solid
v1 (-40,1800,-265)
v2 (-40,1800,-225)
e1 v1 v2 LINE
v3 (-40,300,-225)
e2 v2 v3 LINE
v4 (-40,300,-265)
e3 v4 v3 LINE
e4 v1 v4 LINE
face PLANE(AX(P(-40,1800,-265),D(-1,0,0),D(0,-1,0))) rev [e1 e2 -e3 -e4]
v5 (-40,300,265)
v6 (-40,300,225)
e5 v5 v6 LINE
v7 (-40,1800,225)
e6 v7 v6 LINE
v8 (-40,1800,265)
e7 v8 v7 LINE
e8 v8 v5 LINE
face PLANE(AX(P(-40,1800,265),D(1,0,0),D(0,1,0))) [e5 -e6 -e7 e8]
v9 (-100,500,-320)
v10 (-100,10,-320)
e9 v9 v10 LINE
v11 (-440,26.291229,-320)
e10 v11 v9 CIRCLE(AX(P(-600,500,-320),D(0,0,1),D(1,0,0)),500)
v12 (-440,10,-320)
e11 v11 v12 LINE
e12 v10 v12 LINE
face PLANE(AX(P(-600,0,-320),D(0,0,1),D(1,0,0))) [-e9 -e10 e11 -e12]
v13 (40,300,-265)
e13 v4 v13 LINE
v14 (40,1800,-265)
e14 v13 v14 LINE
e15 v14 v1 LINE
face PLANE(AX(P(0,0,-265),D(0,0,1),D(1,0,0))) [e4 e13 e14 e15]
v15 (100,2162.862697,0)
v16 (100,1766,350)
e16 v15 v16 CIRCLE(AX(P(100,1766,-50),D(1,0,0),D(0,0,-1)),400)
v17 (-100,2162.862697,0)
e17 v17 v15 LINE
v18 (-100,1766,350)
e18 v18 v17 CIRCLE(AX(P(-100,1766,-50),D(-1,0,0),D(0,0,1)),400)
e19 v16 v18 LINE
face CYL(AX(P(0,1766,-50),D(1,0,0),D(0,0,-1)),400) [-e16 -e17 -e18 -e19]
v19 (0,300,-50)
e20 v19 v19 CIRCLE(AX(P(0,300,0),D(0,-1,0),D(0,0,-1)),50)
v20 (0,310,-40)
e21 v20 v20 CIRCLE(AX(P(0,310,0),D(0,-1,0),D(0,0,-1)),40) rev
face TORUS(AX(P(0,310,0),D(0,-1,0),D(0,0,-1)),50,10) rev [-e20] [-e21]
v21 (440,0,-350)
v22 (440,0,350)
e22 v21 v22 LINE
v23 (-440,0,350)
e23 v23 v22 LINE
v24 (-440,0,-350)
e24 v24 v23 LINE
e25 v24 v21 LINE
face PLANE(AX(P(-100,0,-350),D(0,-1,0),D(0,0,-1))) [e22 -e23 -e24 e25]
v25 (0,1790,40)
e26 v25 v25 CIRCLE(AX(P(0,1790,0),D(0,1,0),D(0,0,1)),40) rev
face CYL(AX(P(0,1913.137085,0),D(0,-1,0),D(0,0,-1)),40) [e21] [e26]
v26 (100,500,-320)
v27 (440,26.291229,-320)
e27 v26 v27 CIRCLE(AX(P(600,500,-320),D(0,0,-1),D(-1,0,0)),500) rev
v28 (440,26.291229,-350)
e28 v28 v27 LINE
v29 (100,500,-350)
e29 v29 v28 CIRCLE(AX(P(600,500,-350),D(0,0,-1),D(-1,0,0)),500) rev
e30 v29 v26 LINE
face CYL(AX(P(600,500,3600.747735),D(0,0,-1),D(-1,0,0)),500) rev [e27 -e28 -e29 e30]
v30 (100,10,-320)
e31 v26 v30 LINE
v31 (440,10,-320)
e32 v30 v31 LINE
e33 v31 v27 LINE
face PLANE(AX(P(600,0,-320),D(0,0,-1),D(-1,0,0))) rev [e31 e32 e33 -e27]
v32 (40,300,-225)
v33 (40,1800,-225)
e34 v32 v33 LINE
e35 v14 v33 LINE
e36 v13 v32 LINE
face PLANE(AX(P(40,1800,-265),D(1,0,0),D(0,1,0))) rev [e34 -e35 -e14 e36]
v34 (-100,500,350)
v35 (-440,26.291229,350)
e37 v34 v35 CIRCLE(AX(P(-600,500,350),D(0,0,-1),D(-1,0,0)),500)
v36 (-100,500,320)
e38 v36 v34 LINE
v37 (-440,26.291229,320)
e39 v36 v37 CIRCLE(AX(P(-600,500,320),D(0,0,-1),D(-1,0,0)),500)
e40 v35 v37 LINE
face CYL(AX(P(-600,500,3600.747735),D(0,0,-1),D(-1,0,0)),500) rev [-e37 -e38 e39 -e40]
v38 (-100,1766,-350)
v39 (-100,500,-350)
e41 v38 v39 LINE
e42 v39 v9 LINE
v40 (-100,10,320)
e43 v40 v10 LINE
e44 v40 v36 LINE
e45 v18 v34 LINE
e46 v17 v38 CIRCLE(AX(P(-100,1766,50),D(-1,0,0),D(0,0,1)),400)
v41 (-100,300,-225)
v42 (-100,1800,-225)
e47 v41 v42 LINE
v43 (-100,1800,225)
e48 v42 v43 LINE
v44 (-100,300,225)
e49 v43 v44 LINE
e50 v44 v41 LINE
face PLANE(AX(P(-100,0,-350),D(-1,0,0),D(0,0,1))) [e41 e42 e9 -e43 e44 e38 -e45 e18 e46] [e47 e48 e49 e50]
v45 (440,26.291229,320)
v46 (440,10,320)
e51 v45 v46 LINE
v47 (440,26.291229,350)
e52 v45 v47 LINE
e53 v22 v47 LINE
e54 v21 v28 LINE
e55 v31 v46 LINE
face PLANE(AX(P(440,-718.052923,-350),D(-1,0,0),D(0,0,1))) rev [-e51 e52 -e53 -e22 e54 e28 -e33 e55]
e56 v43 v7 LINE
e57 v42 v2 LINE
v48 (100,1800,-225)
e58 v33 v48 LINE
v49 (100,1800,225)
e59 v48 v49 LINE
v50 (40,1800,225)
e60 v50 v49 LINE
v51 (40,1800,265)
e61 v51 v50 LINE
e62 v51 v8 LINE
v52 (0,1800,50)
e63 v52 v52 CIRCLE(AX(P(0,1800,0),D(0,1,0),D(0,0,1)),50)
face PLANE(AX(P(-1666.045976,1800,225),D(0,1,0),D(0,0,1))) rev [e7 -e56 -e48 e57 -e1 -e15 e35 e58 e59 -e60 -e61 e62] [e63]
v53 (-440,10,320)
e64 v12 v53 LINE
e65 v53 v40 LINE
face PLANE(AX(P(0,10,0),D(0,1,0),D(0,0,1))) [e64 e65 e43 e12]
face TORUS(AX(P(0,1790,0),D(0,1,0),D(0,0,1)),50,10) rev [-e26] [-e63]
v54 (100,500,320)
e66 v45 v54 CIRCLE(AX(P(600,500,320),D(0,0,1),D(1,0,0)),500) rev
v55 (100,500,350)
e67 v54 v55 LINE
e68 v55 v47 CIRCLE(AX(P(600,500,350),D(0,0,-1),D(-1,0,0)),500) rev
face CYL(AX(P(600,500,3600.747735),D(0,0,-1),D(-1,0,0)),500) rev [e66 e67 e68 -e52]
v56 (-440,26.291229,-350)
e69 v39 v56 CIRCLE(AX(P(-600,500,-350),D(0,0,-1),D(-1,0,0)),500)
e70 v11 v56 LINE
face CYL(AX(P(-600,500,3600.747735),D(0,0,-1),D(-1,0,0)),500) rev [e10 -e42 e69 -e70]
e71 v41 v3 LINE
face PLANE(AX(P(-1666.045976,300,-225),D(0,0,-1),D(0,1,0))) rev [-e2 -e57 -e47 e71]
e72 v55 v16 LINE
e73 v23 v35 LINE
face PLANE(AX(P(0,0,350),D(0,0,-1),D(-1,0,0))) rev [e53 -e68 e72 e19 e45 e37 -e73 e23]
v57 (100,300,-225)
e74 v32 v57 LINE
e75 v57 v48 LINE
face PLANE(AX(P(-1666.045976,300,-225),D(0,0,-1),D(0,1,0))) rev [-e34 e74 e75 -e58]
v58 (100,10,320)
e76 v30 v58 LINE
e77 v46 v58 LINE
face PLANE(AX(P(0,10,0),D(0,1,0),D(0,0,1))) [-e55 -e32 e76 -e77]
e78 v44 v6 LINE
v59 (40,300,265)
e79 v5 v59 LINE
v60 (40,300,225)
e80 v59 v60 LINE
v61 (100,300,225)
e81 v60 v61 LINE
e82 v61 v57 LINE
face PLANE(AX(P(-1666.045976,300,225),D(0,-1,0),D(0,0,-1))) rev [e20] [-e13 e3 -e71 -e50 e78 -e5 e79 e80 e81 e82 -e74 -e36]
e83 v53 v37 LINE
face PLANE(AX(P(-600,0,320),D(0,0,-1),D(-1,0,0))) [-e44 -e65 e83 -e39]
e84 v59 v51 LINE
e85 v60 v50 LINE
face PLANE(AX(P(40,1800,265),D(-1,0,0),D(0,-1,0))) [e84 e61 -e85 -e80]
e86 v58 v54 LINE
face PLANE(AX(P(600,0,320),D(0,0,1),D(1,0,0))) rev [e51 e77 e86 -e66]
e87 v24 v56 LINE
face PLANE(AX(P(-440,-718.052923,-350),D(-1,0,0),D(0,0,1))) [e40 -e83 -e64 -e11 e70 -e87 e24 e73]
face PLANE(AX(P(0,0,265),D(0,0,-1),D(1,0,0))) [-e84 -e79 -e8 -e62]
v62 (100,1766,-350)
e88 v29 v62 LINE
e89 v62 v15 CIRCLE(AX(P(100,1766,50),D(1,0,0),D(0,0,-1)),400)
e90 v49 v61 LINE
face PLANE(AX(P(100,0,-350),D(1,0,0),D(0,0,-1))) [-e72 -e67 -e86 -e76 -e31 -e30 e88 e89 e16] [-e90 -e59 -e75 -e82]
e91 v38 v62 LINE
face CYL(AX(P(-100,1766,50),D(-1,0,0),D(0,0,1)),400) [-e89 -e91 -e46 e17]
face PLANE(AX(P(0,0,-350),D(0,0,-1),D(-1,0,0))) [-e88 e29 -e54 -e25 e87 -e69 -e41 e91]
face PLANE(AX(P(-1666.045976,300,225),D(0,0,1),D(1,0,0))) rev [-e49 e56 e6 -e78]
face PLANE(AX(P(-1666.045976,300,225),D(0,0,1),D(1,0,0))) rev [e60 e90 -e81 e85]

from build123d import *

# Parameters (mm, degrees)
AUFSATZ_LINEAR_AUSTRAGEN1_DEPTH             = 350
AUFSATZ_LINEAR_AUSTRAGEN1_DEPTH_BACK        = 350
SKIZZE1_W                                   = 200
SKIZZE1_H                                   = 2166
VERRUNDUNG1_R                               = 400
SKIZZE2_W                                   = 450
SKIZZE2_H                                   = 1500
SCHNITT_LINEAR_AUSTRAGEN1_DEPTH             = 200
SKIZZE4_W                                   = 80
SKIZZE4_H                                   = 1500
SCHNITT_LINEAR_AUSTRAGEN2_DEPTH             = 40
SKIZZE5_R                                   = 40
AUFSATZ_LINEAR_AUSTRAGEN2_DEPTH             = 1500
VERRUNDUNG2_R                               = 10
SKIZZE6_W                                   = 30
SKIZZE6_H                                   = 500
AUFSATZ_LINEAR_AUSTRAGEN3_DEPTH             = 500
SKIZZE7_W                                   = 1200
SKIZZE7_H                                   = 700
AUFSATZ_LINEAR_AUSTRAGEN4_DEPTH             = 10
SCHNITT_LINEAR_AUSTRAGEN3_DEPTH             = 2352.164614527
SCHNITT_LINEAR_AUSTRAGEN4_REACH             = 2264.149
SKIZZE10_W                                  = 160
SKIZZE10_H                                  = 700
SCHNITT_LINEAR_AUSTRAGEN4_DIRECTION_2_DEPTH = 2263.148932027


with BuildPart() as part:
    # Skizze1 → Aufsatz-Linear austragen1 (new, two sides: drawn at the far end of the back side and taken through both)
    with BuildSketch(Plane.XY.offset(-AUFSATZ_LINEAR_AUSTRAGEN1_DEPTH_BACK)):
        with Locations((0, 1083)):
            Rectangle(SKIZZE1_W, SKIZZE1_H)
    extrude(amount=AUFSATZ_LINEAR_AUSTRAGEN1_DEPTH + AUFSATZ_LINEAR_AUSTRAGEN1_DEPTH_BACK)

    # Verrundung1
    # the kernel refuses this fillet: 400 mm, written as the material it takes off along each edge
    with BuildSketch(Plane(origin=(1100, 2166, -350), x_dir=(0, -1, 0), z_dir=(-1, 0, 0)), Plane(origin=(1100, 2166, 350), x_dir=(0, 0, -1), z_dir=(-1, 0, 0))) as verrundung1_piece_1:
        with BuildLine():
            CenterArc((VERRUNDUNG1_R, VERRUNDUNG1_R), VERRUNDUNG1_R, 180, 90)
            Line((0, VERRUNDUNG1_R), (0, 0))
            Line((0, 0), (VERRUNDUNG1_R, 0))
        make_face()
    extrude(amount=2200, mode=Mode.SUBTRACT)

    # Skizze2 → Schnitt-Linear austragen1 (cut)
    with BuildSketch(Plane(origin=(100, 0, 0), x_dir=(0, 0, -1), z_dir=(1, 0, 0))):
        with Locations((0, 1050)):
            Rectangle(SKIZZE2_W, SKIZZE2_H)
    extrude(amount=-SCHNITT_LINEAR_AUSTRAGEN1_DEPTH, mode=Mode.SUBTRACT)

    # Skizze4 → Schnitt-Linear austragen2 (cut)
    with BuildSketch(Plane.XY.offset(-225)):
        with Locations((0, 1050)):
            Rectangle(SKIZZE4_W, SKIZZE4_H)
    schnitt_linear_austragen2 = extrude(amount=-SCHNITT_LINEAR_AUSTRAGEN2_DEPTH, mode=Mode.SUBTRACT)

    # Spiegeln1: Schnitt-Linear austragen2 across plane
    add(schnitt_linear_austragen2.mirror(Plane.XY), mode=Mode.SUBTRACT)

    # Skizze5 → Aufsatz-Linear austragen2 (add)
    with BuildSketch(Plane(origin=(0, 300, 0), x_dir=(1, 0, 0), z_dir=(0, 1, 0))):
        with Locations(Location((0, 0, 0), (0, 0, 90))):
            Circle(SKIZZE5_R)
    extrude(amount=AUFSATZ_LINEAR_AUSTRAGEN2_DEPTH)

    # Verrundung2
    verrundung2_edges = [part.edges().sort_by_distance(p)[0] for p in [
        (0, 300, 40),
        (0, 1800, 40),
    ]]
    fillet(verrundung2_edges, radius=VERRUNDUNG2_R)

    # Skizze6 → Aufsatz-Linear austragen3 (add)
    with BuildSketch(Plane(origin=(100, 0, 0), x_dir=(0, 0, -1), z_dir=(1, 0, 0))):
        with Locations((-335, 250)):
            Rectangle(SKIZZE6_W, SKIZZE6_H)
        with Locations((335, 250)):
            Rectangle(SKIZZE6_W, SKIZZE6_H)
    aufsatz_linear_austragen3 = extrude(amount=AUFSATZ_LINEAR_AUSTRAGEN3_DEPTH)

    # Spiegeln2: Aufsatz-Linear austragen3 across plane
    add(aufsatz_linear_austragen3.mirror(Plane(origin=(0, 0, 0), x_dir=(0, 0, 1), z_dir=(1, 0, 0))))

    # Skizze7 → Aufsatz-Linear austragen4 (add)
    with BuildSketch(Plane.XZ):
        Rectangle(SKIZZE7_W, SKIZZE7_H)
    extrude(amount=-AUFSATZ_LINEAR_AUSTRAGEN4_DEPTH)

    # Skizze9 → Schnitt-Linear austragen3 (cut, symmetric)
    with BuildSketch(Plane.XY.offset(350)):
        with BuildLine():
            Line((100, 5456.908143316), (100, 500))
            ThreePointArc((100, 500), (246.446609407, 146.446609407), (600, 0))
            Line((600, 0), (5556.908143316, 0))
            Line((5556.908143316, 0), (12567.034867032, 7010.126723715))
            Line((12567.034867032, 7010.126723715), (7110.126723715, 12467.034867032))
            Line((7110.126723715, 12467.034867032), (100, 5456.908143316))
        make_face()
    schnitt_linear_austragen3 = extrude(amount=SCHNITT_LINEAR_AUSTRAGEN3_DEPTH, both=True, mode=Mode.SUBTRACT)

    # Spiegeln3: Schnitt-Linear austragen3 across plane
    add(schnitt_linear_austragen3.mirror(Plane(origin=(0, 0, 0), x_dir=(0, 0, 1), z_dir=(1, 0, 0))), mode=Mode.SUBTRACT)

    # Schnitt-Linear austragen4: up to this face of the body (flat: up to its plane)
    schnitt_linear_austragen4_end = Plane(part.part.faces().sort_by_distance((0, 0, 0))[0])
    # Skizze10 → Schnitt-Linear austragen4 (cut, up to the picked face)
    with BuildSketch(Plane(origin=(0, 10, 0), x_dir=(1, 0, 0), z_dir=(0, 1, 0)), mode=Mode.PRIVATE) as schnitt_linear_austragen4_sk1:
        with Locations((520, 0)):
            Rectangle(SKIZZE10_W, SKIZZE10_H)
    schnitt_linear_austragen4_tool1 = split(extrude(schnitt_linear_austragen4_sk1.sketch, amount=-SCHNITT_LINEAR_AUSTRAGEN4_REACH, mode=Mode.PRIVATE), bisect_by=schnitt_linear_austragen4_end, keep=Keep.BOTH, mode=Mode.PRIVATE)
    schnitt_linear_austragen4 = schnitt_linear_austragen4_tool1.solids().sort_by(Axis((520, 10, 0), (0, -1, 0)))[0]
    add(schnitt_linear_austragen4, mode=Mode.SUBTRACT)

    # Skizze10 → Schnitt-Linear austragen4 direction 2 (cut)
    with BuildSketch(Plane(origin=(0, 10, 0), x_dir=(1, 0, 0), z_dir=(0, 1, 0))):
        with Locations((520, 0)):
            Rectangle(SKIZZE10_W, SKIZZE10_H)
    schnitt_linear_austragen4_direction_2 = extrude(amount=SCHNITT_LINEAR_AUSTRAGEN4_DIRECTION_2_DEPTH, mode=Mode.SUBTRACT)

    # Spiegeln4: Schnitt-Linear austragen4, Schnitt-Linear austragen4 direction 2 across plane
    add(schnitt_linear_austragen4.mirror(Plane(origin=(0, 0, 0), x_dir=(0, 0, 1), z_dir=(1, 0, 0))), mode=Mode.SUBTRACT)
    add(schnitt_linear_austragen4_direction_2.mirror(Plane(origin=(0, 0, 0), x_dir=(0, 0, 1), z_dir=(1, 0, 0))), mode=Mode.SUBTRACT)


solid = part.part
